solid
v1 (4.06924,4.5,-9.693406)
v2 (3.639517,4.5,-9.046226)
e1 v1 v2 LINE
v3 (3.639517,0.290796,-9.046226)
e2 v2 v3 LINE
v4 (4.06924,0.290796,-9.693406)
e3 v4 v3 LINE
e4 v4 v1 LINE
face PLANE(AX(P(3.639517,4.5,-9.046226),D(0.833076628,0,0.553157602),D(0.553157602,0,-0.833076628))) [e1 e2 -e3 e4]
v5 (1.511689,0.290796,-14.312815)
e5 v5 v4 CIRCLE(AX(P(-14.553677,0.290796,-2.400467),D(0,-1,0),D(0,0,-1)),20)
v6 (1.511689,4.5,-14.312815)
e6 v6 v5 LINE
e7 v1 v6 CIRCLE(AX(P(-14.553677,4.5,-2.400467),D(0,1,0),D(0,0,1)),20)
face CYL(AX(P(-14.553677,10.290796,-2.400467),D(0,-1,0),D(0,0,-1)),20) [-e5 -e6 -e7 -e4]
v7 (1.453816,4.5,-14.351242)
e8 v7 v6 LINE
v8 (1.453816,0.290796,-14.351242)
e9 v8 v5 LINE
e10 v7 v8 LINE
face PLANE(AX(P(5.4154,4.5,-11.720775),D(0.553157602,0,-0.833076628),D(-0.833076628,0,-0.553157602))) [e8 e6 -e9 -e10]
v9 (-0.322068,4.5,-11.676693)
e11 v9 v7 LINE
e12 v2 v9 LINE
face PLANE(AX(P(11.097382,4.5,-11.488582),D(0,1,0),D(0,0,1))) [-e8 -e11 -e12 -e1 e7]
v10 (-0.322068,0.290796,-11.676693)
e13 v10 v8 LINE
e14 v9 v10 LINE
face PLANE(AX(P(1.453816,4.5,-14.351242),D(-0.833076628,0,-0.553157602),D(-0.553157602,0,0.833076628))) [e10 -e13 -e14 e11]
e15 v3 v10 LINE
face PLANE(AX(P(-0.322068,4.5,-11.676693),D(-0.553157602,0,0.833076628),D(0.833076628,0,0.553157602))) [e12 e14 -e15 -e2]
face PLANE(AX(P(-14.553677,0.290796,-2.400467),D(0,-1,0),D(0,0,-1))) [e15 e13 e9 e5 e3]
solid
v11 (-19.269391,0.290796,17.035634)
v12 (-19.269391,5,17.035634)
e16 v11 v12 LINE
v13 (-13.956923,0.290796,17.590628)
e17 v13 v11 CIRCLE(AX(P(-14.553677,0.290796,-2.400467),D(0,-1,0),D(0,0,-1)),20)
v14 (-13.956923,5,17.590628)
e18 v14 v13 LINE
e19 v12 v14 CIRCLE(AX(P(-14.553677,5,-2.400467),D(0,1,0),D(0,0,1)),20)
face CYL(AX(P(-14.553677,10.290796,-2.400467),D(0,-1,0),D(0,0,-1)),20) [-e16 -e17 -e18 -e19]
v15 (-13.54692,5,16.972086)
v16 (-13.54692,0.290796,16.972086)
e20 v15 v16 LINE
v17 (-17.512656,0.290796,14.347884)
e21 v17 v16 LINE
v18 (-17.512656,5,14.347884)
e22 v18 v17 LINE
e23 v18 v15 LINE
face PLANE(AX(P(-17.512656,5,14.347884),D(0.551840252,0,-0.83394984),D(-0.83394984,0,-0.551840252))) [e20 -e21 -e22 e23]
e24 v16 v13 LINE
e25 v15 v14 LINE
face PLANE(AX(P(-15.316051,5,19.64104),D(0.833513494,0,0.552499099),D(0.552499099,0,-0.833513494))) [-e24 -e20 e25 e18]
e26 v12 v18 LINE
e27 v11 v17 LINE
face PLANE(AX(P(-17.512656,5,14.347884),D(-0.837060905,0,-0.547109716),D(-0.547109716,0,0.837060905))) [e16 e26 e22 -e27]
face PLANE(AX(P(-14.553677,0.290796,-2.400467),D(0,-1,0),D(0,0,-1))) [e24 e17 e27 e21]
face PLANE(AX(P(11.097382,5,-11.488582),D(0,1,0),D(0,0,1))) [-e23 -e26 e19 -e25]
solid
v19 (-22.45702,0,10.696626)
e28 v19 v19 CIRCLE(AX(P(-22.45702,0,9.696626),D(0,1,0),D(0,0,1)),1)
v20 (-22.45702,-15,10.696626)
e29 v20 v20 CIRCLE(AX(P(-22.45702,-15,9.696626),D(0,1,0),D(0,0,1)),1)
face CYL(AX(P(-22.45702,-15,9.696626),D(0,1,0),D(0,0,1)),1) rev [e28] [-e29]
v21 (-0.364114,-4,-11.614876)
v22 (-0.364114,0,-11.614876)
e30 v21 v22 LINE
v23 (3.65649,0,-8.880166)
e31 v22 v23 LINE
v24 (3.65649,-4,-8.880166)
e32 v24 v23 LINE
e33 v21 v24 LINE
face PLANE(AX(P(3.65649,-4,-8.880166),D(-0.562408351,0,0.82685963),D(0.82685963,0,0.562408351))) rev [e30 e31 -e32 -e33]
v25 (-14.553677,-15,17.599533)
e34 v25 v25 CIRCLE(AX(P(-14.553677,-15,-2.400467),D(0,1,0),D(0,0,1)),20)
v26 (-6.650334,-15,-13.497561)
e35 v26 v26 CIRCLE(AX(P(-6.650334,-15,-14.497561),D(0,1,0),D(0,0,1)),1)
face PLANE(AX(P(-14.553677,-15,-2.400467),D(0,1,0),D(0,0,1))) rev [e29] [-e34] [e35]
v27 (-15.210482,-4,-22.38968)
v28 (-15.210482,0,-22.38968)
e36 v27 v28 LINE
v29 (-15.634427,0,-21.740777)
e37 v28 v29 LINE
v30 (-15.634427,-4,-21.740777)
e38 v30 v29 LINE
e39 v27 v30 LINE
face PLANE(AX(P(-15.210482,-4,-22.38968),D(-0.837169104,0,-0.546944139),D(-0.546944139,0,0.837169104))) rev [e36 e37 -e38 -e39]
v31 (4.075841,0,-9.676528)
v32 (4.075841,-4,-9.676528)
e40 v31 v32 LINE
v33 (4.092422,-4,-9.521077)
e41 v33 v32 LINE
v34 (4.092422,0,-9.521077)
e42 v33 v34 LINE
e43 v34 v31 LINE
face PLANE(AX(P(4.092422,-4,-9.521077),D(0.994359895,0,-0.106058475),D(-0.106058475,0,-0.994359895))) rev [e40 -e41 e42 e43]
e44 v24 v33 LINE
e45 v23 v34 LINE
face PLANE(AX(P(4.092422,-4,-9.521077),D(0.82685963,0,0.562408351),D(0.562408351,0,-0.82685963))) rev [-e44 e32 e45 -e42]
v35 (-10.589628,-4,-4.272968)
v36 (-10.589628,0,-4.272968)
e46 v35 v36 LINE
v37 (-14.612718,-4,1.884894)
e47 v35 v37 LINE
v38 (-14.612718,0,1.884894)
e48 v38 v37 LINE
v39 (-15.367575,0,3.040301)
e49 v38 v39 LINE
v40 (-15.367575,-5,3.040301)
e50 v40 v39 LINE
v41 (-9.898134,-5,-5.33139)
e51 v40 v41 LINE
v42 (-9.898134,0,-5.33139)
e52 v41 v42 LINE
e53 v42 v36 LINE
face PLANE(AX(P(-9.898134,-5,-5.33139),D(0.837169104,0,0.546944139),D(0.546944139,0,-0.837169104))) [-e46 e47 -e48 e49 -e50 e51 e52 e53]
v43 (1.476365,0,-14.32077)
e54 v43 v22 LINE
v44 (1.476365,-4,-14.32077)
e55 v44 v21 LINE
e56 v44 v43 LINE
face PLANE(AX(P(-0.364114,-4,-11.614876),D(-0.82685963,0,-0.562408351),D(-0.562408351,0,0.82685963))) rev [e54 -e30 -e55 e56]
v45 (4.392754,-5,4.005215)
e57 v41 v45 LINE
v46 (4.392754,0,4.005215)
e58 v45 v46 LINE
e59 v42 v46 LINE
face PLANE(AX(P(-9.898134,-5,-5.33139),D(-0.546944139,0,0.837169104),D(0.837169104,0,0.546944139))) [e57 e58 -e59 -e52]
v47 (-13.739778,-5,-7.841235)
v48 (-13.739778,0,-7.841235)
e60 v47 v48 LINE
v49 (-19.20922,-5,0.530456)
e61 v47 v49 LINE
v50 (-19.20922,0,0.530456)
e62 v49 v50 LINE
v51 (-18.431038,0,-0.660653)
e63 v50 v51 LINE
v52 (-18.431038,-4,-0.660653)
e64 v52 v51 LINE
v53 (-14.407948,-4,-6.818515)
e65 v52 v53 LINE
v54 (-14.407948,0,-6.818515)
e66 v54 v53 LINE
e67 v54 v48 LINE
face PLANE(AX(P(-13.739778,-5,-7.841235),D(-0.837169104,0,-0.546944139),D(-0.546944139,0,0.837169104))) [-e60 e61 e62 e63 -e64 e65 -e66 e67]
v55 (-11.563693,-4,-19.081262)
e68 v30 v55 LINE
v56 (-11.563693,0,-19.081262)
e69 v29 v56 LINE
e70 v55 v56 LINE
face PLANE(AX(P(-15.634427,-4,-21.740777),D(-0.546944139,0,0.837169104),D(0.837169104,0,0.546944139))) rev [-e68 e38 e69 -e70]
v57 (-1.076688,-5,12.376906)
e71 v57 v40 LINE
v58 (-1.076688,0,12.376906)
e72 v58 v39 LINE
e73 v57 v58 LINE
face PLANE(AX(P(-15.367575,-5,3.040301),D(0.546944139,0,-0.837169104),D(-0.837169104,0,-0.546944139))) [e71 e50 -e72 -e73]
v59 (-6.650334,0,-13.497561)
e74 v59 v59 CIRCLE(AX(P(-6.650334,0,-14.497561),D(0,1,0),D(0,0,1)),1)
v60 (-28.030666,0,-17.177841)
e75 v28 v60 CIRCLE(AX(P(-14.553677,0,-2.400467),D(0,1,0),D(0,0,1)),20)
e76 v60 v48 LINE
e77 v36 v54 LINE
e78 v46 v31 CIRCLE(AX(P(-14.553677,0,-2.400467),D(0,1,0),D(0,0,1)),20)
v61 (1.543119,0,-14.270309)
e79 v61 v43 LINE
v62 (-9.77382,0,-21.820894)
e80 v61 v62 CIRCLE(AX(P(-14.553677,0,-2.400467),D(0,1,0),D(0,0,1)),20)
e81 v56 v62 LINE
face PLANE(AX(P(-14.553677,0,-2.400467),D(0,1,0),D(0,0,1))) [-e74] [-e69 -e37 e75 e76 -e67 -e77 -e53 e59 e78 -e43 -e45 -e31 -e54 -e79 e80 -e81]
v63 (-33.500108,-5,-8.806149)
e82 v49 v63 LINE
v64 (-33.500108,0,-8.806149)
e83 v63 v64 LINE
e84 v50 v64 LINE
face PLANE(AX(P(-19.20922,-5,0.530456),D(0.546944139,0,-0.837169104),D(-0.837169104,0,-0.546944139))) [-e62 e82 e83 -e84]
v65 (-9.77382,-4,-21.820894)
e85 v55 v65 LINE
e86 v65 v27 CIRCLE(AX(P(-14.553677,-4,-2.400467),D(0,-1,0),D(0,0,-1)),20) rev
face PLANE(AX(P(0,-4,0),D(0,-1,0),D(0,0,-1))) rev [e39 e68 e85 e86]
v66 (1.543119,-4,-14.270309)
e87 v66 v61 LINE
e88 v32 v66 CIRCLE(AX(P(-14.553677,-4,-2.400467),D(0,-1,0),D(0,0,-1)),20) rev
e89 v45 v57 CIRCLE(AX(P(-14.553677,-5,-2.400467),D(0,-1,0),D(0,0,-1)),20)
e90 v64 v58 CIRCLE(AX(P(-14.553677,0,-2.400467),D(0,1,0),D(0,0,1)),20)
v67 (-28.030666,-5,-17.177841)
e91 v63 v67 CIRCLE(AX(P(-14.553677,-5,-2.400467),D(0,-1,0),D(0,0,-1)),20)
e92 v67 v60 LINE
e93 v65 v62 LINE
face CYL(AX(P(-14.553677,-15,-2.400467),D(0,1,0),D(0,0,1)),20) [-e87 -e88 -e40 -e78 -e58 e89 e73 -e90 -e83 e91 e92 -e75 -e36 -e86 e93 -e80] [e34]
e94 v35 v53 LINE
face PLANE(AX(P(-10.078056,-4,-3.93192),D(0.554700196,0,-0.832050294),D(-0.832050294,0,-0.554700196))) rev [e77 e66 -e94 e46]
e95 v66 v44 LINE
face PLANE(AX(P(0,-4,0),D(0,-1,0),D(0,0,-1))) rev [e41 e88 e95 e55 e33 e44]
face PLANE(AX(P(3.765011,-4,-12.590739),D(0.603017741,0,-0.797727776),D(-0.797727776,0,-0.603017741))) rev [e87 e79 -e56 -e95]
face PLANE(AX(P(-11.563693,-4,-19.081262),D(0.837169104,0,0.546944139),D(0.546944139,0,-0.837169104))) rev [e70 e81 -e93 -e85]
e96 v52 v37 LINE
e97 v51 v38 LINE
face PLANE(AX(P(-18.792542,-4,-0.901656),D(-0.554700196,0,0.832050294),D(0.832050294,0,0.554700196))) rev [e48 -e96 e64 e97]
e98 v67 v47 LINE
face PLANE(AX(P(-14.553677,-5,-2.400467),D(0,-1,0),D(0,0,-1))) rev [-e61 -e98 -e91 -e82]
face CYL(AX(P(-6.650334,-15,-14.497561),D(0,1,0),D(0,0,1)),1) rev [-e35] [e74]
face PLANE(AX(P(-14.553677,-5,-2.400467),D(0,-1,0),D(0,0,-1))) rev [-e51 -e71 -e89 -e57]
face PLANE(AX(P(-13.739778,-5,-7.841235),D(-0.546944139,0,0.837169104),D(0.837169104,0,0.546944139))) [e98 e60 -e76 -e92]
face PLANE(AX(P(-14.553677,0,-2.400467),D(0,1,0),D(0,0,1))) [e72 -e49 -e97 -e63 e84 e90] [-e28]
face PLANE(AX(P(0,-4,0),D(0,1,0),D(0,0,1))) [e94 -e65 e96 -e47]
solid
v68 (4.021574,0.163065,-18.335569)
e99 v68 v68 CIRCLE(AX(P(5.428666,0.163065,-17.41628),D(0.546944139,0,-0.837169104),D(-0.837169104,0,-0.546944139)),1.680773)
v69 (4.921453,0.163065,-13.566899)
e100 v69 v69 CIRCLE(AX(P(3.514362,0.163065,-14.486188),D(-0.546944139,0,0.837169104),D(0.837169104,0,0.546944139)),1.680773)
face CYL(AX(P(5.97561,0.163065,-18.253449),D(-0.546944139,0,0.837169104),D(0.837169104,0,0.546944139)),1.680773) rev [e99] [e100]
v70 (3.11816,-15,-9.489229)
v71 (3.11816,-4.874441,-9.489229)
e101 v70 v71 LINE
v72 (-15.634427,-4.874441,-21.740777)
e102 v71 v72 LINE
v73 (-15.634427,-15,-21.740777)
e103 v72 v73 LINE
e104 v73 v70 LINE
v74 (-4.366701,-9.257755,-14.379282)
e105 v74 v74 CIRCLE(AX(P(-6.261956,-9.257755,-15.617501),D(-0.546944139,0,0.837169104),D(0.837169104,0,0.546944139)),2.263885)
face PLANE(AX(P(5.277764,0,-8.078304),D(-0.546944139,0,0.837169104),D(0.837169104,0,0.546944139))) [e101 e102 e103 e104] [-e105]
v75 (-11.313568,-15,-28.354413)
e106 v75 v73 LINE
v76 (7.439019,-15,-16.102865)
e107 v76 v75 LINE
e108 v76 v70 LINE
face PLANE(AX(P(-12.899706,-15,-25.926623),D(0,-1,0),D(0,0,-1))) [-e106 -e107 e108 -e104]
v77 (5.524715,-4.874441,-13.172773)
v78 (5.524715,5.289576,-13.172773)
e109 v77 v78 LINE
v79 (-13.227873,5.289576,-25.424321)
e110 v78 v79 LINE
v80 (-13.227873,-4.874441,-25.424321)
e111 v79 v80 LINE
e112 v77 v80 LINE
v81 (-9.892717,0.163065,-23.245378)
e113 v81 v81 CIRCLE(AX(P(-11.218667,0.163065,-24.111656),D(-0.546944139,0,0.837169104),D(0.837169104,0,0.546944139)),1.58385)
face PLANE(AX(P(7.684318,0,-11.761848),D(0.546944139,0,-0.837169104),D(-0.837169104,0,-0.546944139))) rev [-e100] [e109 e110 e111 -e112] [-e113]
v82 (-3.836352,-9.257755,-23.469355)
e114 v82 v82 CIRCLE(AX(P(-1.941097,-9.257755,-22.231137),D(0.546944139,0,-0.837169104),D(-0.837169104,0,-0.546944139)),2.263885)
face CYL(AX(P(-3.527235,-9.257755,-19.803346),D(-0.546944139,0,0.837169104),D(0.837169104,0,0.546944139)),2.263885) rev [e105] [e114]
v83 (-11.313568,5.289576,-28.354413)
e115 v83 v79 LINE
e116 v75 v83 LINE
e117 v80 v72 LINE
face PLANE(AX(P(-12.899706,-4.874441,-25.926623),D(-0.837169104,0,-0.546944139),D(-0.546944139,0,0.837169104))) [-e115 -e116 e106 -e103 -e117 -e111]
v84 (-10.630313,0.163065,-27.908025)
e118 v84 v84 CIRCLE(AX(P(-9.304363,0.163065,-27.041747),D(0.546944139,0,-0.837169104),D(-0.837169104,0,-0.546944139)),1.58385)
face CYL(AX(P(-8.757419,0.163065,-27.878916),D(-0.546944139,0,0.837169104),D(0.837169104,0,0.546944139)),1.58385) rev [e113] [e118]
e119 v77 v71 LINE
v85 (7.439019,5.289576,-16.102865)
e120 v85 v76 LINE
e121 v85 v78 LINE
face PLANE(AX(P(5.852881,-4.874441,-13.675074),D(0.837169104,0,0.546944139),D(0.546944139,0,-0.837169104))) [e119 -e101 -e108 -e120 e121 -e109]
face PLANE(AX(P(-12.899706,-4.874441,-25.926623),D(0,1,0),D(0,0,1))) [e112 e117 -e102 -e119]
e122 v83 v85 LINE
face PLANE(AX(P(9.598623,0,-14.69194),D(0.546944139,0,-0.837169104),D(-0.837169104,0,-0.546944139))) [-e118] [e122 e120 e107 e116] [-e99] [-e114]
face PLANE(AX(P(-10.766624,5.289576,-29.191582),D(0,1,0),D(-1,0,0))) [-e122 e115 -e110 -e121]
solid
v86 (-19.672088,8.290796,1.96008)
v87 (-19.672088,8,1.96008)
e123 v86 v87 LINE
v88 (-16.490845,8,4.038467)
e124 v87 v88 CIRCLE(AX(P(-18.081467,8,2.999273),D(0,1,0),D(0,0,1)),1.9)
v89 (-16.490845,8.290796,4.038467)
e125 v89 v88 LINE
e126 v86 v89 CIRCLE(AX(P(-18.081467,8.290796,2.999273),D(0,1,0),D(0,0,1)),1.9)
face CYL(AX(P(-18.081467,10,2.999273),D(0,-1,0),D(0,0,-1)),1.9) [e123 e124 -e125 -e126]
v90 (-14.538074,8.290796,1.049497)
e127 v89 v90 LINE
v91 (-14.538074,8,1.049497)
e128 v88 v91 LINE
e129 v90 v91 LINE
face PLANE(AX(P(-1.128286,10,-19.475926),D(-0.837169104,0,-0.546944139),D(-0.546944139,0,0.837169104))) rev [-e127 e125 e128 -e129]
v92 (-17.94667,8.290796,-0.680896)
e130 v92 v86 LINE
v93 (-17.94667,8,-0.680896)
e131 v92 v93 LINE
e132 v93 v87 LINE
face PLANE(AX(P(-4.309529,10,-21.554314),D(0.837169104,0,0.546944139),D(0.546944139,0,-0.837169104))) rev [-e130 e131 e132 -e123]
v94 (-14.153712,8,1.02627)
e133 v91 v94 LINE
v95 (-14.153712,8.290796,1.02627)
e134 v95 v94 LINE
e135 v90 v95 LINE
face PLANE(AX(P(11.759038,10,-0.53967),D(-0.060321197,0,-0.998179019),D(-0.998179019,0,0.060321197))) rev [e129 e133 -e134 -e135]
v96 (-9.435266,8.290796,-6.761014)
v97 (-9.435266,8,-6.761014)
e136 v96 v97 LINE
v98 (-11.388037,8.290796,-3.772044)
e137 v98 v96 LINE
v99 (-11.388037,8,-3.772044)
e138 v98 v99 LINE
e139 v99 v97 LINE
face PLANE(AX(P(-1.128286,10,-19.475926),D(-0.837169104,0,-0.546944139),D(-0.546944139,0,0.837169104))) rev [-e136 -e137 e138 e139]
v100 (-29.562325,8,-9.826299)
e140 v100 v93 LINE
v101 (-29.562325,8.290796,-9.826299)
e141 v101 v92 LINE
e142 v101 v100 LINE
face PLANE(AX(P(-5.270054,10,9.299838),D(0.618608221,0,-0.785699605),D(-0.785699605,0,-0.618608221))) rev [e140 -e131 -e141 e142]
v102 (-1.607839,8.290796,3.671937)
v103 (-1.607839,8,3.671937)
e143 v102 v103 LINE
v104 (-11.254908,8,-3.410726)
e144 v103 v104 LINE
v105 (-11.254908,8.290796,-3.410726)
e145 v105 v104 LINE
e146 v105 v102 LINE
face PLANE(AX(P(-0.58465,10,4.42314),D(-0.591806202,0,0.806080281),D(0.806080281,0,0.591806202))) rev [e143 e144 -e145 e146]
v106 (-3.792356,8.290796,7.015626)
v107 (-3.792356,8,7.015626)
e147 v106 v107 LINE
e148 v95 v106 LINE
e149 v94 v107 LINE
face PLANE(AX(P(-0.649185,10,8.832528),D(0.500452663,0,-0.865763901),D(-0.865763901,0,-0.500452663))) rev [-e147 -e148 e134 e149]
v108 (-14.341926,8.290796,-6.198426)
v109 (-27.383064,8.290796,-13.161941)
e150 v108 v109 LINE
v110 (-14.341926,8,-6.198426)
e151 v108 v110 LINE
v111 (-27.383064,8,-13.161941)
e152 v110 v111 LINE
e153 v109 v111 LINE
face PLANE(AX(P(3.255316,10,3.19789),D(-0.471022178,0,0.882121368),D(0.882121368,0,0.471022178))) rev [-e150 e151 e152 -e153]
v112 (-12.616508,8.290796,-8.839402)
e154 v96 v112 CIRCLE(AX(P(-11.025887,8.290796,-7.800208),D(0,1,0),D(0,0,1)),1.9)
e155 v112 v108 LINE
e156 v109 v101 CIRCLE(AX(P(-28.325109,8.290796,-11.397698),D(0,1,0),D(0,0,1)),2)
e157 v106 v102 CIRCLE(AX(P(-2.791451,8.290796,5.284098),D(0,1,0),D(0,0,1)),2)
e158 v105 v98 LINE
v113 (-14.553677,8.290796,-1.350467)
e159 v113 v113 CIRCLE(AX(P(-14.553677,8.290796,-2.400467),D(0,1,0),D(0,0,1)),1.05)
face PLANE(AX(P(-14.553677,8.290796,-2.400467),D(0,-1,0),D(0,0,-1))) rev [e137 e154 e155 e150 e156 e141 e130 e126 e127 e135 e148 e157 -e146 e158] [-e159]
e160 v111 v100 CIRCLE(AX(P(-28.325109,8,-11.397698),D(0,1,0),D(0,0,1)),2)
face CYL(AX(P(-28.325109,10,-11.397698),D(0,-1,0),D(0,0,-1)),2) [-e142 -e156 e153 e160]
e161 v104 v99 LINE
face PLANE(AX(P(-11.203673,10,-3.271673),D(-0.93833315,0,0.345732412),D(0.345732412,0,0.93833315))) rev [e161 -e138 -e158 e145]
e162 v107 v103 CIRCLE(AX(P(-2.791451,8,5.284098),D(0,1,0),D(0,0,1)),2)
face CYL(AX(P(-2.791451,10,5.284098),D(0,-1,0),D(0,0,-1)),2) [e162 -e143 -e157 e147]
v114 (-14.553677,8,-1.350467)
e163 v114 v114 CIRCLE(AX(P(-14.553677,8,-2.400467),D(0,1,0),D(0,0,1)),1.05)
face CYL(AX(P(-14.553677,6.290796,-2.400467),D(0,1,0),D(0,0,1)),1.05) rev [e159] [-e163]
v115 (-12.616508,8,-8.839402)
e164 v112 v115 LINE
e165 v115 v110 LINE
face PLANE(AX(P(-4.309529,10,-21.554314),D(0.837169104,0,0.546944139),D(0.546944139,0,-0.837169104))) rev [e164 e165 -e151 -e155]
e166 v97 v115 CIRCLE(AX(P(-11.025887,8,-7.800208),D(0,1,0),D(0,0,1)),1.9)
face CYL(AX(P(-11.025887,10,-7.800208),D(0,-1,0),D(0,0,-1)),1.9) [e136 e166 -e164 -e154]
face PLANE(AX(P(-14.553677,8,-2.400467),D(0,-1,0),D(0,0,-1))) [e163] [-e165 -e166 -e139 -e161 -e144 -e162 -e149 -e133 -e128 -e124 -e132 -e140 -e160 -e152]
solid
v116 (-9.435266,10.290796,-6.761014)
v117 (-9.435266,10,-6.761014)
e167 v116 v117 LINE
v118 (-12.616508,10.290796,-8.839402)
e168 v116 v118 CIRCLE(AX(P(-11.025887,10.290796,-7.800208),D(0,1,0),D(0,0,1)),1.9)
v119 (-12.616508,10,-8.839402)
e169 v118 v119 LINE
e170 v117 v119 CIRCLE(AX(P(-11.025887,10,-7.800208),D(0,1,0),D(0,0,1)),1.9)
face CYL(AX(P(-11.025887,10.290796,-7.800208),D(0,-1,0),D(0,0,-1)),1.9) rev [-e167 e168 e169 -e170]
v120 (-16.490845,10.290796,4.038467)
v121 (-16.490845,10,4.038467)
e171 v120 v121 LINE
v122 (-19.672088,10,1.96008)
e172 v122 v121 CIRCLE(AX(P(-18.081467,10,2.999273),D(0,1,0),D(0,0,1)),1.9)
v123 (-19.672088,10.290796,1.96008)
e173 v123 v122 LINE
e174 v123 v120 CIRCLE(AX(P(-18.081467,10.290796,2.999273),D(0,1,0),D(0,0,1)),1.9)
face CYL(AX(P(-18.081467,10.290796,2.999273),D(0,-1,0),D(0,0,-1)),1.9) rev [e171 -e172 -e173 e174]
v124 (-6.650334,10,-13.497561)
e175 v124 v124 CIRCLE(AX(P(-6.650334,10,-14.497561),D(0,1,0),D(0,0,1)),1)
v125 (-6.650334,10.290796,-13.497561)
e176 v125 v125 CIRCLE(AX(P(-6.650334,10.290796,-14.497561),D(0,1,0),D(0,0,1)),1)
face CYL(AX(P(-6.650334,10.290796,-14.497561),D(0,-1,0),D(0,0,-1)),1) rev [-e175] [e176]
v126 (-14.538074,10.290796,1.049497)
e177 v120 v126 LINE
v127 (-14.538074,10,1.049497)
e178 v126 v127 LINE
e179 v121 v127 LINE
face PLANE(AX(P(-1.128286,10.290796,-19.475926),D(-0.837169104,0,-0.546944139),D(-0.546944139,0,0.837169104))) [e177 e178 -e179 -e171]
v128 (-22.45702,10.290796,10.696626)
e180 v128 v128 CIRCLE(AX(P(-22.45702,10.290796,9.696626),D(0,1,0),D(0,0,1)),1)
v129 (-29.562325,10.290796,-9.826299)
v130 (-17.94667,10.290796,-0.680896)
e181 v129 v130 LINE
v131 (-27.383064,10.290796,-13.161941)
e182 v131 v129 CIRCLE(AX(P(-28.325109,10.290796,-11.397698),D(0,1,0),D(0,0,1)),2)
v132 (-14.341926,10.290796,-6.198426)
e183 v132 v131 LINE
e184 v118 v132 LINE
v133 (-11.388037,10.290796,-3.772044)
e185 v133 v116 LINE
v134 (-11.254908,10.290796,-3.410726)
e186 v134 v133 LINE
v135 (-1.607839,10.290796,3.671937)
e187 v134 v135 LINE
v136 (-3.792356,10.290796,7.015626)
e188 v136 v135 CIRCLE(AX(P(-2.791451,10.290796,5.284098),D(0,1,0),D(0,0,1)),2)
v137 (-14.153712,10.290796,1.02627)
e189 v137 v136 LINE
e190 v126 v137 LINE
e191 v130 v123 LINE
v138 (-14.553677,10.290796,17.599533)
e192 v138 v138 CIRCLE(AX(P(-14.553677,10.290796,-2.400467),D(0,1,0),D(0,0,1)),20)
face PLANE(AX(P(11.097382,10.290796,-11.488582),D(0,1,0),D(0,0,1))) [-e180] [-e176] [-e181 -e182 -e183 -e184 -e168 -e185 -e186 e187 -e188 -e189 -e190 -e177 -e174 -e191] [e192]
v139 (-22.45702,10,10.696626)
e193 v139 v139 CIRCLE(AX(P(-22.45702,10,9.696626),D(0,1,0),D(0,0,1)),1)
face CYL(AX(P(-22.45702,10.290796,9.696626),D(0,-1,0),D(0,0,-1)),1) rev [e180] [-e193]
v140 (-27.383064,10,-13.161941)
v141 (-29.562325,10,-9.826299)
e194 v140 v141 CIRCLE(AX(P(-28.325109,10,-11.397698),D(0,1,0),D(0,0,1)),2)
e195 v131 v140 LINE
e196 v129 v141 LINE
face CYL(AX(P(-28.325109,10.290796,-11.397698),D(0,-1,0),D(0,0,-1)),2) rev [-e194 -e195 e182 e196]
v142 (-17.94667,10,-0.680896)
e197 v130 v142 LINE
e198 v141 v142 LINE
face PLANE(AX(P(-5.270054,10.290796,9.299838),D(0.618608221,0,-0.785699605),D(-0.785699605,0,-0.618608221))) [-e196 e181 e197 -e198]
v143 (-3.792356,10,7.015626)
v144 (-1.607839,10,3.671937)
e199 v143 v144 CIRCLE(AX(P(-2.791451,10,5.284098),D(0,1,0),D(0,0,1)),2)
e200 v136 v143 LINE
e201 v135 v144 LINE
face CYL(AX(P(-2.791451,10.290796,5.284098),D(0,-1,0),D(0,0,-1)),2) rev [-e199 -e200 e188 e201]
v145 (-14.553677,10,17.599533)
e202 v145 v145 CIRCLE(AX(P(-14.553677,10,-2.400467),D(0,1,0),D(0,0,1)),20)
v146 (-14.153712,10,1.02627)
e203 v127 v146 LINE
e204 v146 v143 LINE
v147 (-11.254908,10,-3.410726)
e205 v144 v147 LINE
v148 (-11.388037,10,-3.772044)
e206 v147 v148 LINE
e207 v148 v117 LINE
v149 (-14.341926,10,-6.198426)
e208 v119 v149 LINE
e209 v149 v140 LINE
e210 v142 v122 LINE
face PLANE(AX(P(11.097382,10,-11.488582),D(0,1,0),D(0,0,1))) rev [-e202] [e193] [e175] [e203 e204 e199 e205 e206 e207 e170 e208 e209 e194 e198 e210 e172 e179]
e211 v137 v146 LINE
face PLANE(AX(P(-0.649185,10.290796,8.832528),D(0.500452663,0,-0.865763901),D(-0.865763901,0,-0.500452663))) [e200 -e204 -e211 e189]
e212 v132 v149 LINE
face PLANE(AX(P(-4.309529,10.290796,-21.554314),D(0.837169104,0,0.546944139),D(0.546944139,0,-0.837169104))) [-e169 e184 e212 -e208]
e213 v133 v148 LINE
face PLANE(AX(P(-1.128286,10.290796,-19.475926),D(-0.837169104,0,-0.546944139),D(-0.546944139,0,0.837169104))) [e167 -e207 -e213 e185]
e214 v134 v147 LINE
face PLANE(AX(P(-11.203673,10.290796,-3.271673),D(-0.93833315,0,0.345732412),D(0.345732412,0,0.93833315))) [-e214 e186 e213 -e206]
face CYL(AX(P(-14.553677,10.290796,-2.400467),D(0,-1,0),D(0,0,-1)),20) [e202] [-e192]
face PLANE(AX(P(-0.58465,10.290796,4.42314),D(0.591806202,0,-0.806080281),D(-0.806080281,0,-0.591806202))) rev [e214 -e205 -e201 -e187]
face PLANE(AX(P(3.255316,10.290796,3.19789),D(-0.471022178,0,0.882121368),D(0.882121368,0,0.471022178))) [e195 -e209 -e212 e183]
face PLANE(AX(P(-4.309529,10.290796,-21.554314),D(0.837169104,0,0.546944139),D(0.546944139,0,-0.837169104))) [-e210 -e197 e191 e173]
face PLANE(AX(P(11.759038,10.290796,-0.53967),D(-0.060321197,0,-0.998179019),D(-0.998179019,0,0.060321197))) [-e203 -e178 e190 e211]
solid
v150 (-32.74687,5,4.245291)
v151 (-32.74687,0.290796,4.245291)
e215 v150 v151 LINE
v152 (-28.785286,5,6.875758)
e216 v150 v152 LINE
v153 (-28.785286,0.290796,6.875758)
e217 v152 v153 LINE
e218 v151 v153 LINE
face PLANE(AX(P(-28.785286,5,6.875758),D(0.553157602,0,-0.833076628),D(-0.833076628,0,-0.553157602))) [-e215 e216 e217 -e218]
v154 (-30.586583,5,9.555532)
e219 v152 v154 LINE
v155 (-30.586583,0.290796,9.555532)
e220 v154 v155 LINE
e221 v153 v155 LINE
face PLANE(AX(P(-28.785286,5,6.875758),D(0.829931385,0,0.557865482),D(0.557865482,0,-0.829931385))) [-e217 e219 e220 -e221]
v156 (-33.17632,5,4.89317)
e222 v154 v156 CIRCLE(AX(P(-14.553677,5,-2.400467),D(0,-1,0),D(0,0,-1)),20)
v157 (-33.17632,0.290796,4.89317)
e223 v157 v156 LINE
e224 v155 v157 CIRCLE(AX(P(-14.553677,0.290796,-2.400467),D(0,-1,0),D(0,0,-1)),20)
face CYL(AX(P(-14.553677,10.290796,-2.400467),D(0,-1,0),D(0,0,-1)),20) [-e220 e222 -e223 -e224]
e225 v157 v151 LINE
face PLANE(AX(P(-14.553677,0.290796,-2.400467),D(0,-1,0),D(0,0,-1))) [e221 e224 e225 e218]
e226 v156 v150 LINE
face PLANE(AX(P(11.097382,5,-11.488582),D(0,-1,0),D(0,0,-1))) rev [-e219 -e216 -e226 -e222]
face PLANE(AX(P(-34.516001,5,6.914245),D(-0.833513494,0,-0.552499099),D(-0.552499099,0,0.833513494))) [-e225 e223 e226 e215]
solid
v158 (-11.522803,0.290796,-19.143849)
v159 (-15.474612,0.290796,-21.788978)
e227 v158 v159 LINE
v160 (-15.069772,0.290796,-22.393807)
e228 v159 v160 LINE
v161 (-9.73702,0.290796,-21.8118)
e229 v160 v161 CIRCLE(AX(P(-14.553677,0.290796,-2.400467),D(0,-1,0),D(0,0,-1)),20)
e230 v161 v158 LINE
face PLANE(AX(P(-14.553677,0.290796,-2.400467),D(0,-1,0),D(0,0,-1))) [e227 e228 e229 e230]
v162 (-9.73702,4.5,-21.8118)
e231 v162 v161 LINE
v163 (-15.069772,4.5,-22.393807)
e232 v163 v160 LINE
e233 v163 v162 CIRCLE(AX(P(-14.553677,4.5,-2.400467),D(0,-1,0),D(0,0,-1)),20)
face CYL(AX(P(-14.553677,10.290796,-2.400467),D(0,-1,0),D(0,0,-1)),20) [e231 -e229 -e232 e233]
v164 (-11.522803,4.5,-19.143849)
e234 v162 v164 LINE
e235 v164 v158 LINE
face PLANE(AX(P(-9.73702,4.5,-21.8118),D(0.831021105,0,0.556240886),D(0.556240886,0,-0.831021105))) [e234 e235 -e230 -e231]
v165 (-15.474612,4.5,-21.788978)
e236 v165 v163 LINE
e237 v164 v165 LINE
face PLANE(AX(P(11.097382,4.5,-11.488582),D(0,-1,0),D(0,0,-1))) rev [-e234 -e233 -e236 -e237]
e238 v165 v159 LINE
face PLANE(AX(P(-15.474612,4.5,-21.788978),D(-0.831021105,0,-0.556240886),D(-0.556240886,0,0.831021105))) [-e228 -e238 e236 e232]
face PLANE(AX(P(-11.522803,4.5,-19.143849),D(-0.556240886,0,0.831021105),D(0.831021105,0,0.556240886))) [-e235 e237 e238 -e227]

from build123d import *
from build123d.topology import SkipClean

# Parameters (mm, degrees)
SERVO_CONNECTOR_1_START         = 0.290796426
SERVO_CONNECTOR_1_OUTLINE_R     = 20
SERVO_CONNECTOR_1_OUTLINE_R_2   = 1
SERVO_CONNECTOR_1_DEPTH         = 10
SERVO_CONNECTOR_1_START_2       = -4.709203574
SERVO_CONNECTOR_1_2_DEPTH       = 13
SERVO_CONNECTOR_1_3_DEPTH       = 8
SERVO_CONNECTOR_1_START_3       = 6.290796426
SERVO_CONNECTOR_1_4_OUTLINE_R   = 2.3
SERVO_CONNECTOR_1_4_OUTLINE_R_2 = 1.05
SERVO_CONNECTOR_1_4_DEPTH       = 2
SKETCH5_R                       = 20
SKETCH5_R_2                     = 1
BOSS_EXTRUDE1_DEPTH             = 15
CAVITY1_OUTLINE_R               = 1
CAVITY1_DEPTH                   = 10
CAVITY1_START                   = -5
CAVITY1_2_DEPTH                 = 13
CAVITY1_START_2                 = 0.290796426
CAVITY1_3_OUTLINE_R             = 1.05
CAVITY1_3_DEPTH                 = 7.709203574
CAVITY1_START_3                 = 5
CAVITY1_4_DEPTH                 = 5
CAVITY1_START_4                 = 4.5
CAVITY1_5_DEPTH                 = 0.5
CUT_EXTRUDE1_DEPTH              = 4
SKETCH10_W                      = 22.399999201
SKETCH10_H                      = 20.28957609
SKETCH10_R                      = 2.263885391
SKETCH10_R_2                    = 1.680773428
SKETCH10_R_3                    = 1.58384996
BOSS_EXTRUDE2_DEPTH             = 4.5
SKETCH18_W                      = 22.399999201
SKETCH18_H                      = 10.125559165
SKETCH18_R                      = 2.263885391
BOSS_EXTRUDE26_DEPTH            = 5
CUT_EXTRUDE2_DEPTH              = 4
SKETCH22_W                      = 22.399999201
SKETCH22_H                      = 20.28957609
SKETCH22_R                      = 1.680773428
SKETCH22_R_2                    = 1.58384996
SKETCH22_R_3                    = 2.263885391
CUT_EXTRUDE3_DEPTH              = 1


# Read off the part's stored shape, not the designer's step: Servo_Connector_1, Cavity1
with BuildPart() as part:
    # Servo_Connector_1 outline → Servo_Connector_1 (new body)
    with BuildSketch(Plane(origin=(0, 0, 0), x_dir=(1, 0, 0), z_dir=(0, 1, 0)).offset(SERVO_CONNECTOR_1_START)):
        with Locations((-14.553676836, 2.400467292)):
            Circle(SERVO_CONNECTOR_1_OUTLINE_R)
        with BuildLine():
            Line((-11.254907871, 3.410726325), (-1.607838516, -3.671937294))
            ThreePointArc((-1.607838516, -3.671937294), (-1.117112712, -6.377986132), (-3.792356246, -7.015625657))
            Line((-3.792356246, -7.015625657), (-14.153711806, -1.026269928))
            Line((-14.153711806, -1.026269928), (-14.538074231, -1.049497426))
            Line((-14.538074231, -1.049497426), (-16.490845232, -4.038467294))
            ThreePointArc((-16.490845232, -4.038467294), (-19.120660394, -4.589894729), (-19.672087828, -1.960079567))
            Line((-19.672087828, -1.960079567), (-17.946670336, 0.680896201))
            Line((-17.946670336, 0.680896201), (-29.562325044, 9.826299163))
            ThreePointArc((-29.562325044, 9.826299163), (-29.999446811, 12.49158665), (-27.383064246, 13.161941108))
            Line((-27.383064246, 13.161941108), (-14.341925933, 6.198426111))
            Line((-14.341925933, 6.198426111), (-12.61650844, 8.839401879))
            ThreePointArc((-12.61650844, 8.839401879), (-9.986693279, 9.390829313), (-9.435265844, 6.761014152))
            Line((-9.435265844, 6.761014152), (-11.388036845, 3.772044284))
            Line((-11.388036845, 3.772044284), (-11.254907871, 3.410726325))
        make_face(mode=Mode.SUBTRACT)
        with Locations((-6.650334033, 14.49756085)):
            Circle(SERVO_CONNECTOR_1_OUTLINE_R_2, mode=Mode.SUBTRACT)
        with Locations((-22.457019639, -9.696626265)):
            Circle(SERVO_CONNECTOR_1_OUTLINE_R_2, mode=Mode.SUBTRACT)
    extrude(amount=SERVO_CONNECTOR_1_DEPTH)

    # Servo_Connector_1 2 outline → Servo_Connector_1 2 (add)
    with SkipClean():  # the faces are left unmerged after this step: merging them gives an invalid solid
        with BuildSketch(Plane(origin=(0, 0, 0), x_dir=(1, 0, 0), z_dir=(0, 1, 0)).offset(SERVO_CONNECTOR_1_START_2)):
            with BuildLine():
                Line((-13.744445083, 7.844284333), (-28.030666138, 17.177840515))
                ThreePointArc((-28.030666138, 17.177840515), (-31.297058922, 13.339350064), (-33.500107524, 8.806149471))
                Line((-33.500107524, 8.806149471), (-19.213886469, -0.527406711))
                Line((-19.213886469, -0.527406711), (-13.744445083, 7.844284333))
            make_face()
            with BuildLine():
                Line((-15.362908589, -3.043349748), (-1.076687534, -12.37690593))
                ThreePointArc((-1.076687534, -12.37690593), (2.189705251, -8.53841548), (4.392753852, -4.005214887))
                Line((4.392753852, -4.005214887), (-9.893467203, 5.328341295))
                Line((-9.893467203, 5.328341295), (-15.362908589, -3.043349748))
            make_face()
        extrude(amount=SERVO_CONNECTOR_1_2_DEPTH)

    # Servo_Connector_1 3 outline → Servo_Connector_1 3 (add)
    with SkipClean():  # the faces are left unmerged after this step: merging them gives an invalid solid
        with BuildSketch(Plane(origin=(0, 0, 0), x_dir=(1, 0, 0), z_dir=(0, 1, 0)).offset(SERVO_CONNECTOR_1_START)):
            with BuildLine():
                ThreePointArc((-16.479165734, 3.658438876), (-13.29571537, 4.3259628), (-12.628174718, 1.142515943))
                Line((-12.628174718, 1.142515943), (-11.181503427, 3.356834416))
                Line((-11.181503427, 3.356834416), (-11.254907871, 3.410726325))
                Line((-11.254907871, 3.410726325), (-11.388036845, 3.772044284))
                Line((-11.388036845, 3.772044284), (-9.435265844, 6.761014152))
                ThreePointArc((-9.435265844, 6.761014152), (-9.986693279, 9.390829313), (-12.61650844, 8.839401879))
                Line((-12.61650844, 8.839401879), (-14.341925933, 6.198426111))
                Line((-14.341925933, 6.198426111), (-14.696153283, 6.387571215))
                Line((-14.696153283, 6.387571215), (-16.479165734, 3.658438876))
            make_face()
            with BuildLine():
                ThreePointArc((-12.628174718, 1.142515943), (-15.811638302, 0.474971784), (-16.479165734, 3.658438876))
                Line((-16.479165734, 3.658438876), (-18.262178269, 0.929306407))
                Line((-18.262178269, 0.929306407), (-17.946670336, 0.680896201))
                Line((-17.946670336, 0.680896201), (-19.672087828, -1.960079567))
                ThreePointArc((-19.672087828, -1.960079567), (-19.120660394, -4.589894729), (-16.490845232, -4.038467294))
                Line((-16.490845232, -4.038467294), (-14.538074231, -1.049497426))
                Line((-14.538074231, -1.049497426), (-14.153711806, -1.026269928))
                Line((-14.153711806, -1.026269928), (-14.074872366, -1.07184287))
                Line((-14.074872366, -1.07184287), (-12.628174718, 1.142515943))
            make_face()
        extrude(amount=SERVO_CONNECTOR_1_3_DEPTH)

    # Servo_Connector_1 4 outline → Servo_Connector_1 4 (add)
    with SkipClean():  # the faces are left unmerged after this step: merging them gives an invalid solid
        with BuildSketch(Plane(origin=(0, 0, 0), x_dir=(1, 0, 0), z_dir=(0, 1, 0)).offset(SERVO_CONNECTOR_1_START_3)):
            with Locations((-14.553676836, 2.400467292)):
                Circle(SERVO_CONNECTOR_1_4_OUTLINE_R)
            with Locations((-14.553676836, 2.400467292)):
                Circle(SERVO_CONNECTOR_1_4_OUTLINE_R_2, mode=Mode.SUBTRACT)
        extrude(amount=SERVO_CONNECTOR_1_4_DEPTH)

    # Cavity1 outline → Cavity1 (cut)
    with BuildSketch(Plane(origin=(0, 0, 0), x_dir=(1, 0, 0), z_dir=(0, 1, 0))):
        with BuildLine():
            ThreePointArc((-15.069772054, 22.393807326), (-31.218538546, 13.458603853), (-33.176320371, -4.893170193))
            Line((-33.176320371, -4.893170193), (-32.746870213, -4.245291305))
            Line((-32.746870213, -4.245291305), (-28.785286033, -6.875758097))
            Line((-28.785286033, -6.875758097), (-30.586583313, -9.555531616))
            ThreePointArc((-30.586583313, -9.555531616), (-25.581564287, -14.284427025), (-19.269391365, -17.035634078))
            Line((-19.269391365, -17.035634078), (-17.512656353, -14.347883968))
            Line((-17.512656353, -14.347883968), (-13.546919726, -16.972086279))
            Line((-13.546919726, -16.972086279), (-13.956923486, -17.590627862))
            ThreePointArc((-13.956923486, -17.590627862), (2.133251073, -8.624342773), (4.069240241, 9.693406312))
            Line((4.069240241, 9.693406312), (3.639516541, 9.046225889))
            Line((3.639516541, 9.046225889), (-0.32206764, 11.676692681))
            Line((-0.32206764, 11.676692681), (1.453816138, 14.351241968))
            Line((1.453816138, 14.351241968), (1.511688907, 14.312814817))
            ThreePointArc((1.511688907, 14.312814817), (-3.459831348, 19.041578802), (-9.737020182, 21.811799515))
            Line((-9.737020182, 21.811799515), (-11.522802686, 19.143849379))
            Line((-11.522802686, 19.143849379), (-15.474612102, 21.788978318))
            Line((-15.474612102, 21.788978318), (-15.069772054, 22.393807326))
        make_face()
        with BuildLine():
            Line((-14.341925933, 6.198426111), (-12.61650844, 8.839401879))
            ThreePointArc((-12.61650844, 8.839401879), (-9.986693279, 9.390829313), (-9.435265844, 6.761014152))
            Line((-9.435265844, 6.761014152), (-11.388036845, 3.772044284))
            Line((-11.388036845, 3.772044284), (-11.254907871, 3.410726325))
            Line((-11.254907871, 3.410726325), (-1.607838516, -3.671937294))
            ThreePointArc((-1.607838516, -3.671937294), (-1.117112712, -6.377986132), (-3.792356246, -7.015625657))
            Line((-3.792356246, -7.015625657), (-14.153711806, -1.026269928))
            Line((-14.153711806, -1.026269928), (-14.538074231, -1.049497426))
            Line((-14.538074231, -1.049497426), (-16.490845232, -4.038467294))
            ThreePointArc((-16.490845232, -4.038467294), (-19.120660394, -4.589894729), (-19.672087828, -1.960079567))
            Line((-19.672087828, -1.960079567), (-17.946670336, 0.680896201))
            Line((-17.946670336, 0.680896201), (-29.562325044, 9.826299163))
            ThreePointArc((-29.562325044, 9.826299163), (-29.999446811, 12.49158665), (-27.383064246, 13.161941108))
            Line((-27.383064246, 13.161941108), (-14.341925933, 6.198426111))
        make_face(mode=Mode.SUBTRACT)
        with Locations((-6.650334033, 14.49756085)):
            Circle(CAVITY1_OUTLINE_R, mode=Mode.SUBTRACT)
        with Locations((-22.457019639, -9.696626265)):
            Circle(CAVITY1_OUTLINE_R, mode=Mode.SUBTRACT)
    extrude(amount=CAVITY1_DEPTH, mode=Mode.SUBTRACT)


with BuildPart() as body_2:
    # Sketch5 → Boss-Extrude1 (new body)
    with BuildSketch(Plane(origin=(0, 0, 0), x_dir=(1, 0, 0), z_dir=(0, 1, 0))):
        with Locations(Location((-14.553676836, 2.400467292, 0), (0, 0, 270))):
            Circle(SKETCH5_R)
        with Locations(Location((-6.650334033, 14.49756085, 0), (0, 0, 270))):
            Circle(SKETCH5_R_2, mode=Mode.SUBTRACT)
        with Locations(Location((-22.457019639, -9.696626265, 0), (0, 0, 270))):
            Circle(SKETCH5_R_2, mode=Mode.SUBTRACT)
    extrude(amount=-BOSS_EXTRUDE1_DEPTH)


with BuildPart() as cavity1_2_tool:
    # Cavity1 2 outline → Cavity1 2 (new body)
    with BuildSketch(Plane(origin=(0, 0, 0), x_dir=(1, 0, 0), z_dir=(0, 1, 0)).offset(CAVITY1_START)):
        with BuildLine():
            Line((-13.739778259, 7.841235377), (-28.030666138, 17.177840515))
            ThreePointArc((-28.030666138, 17.177840515), (-31.297058922, 13.339350064), (-33.500107524, 8.806149471))
            Line((-33.500107524, 8.806149471), (-19.209219645, -0.530455667))
            Line((-19.209219645, -0.530455667), (-13.739778259, 7.841235377))
        make_face()
        with BuildLine():
            Line((-15.367575413, -3.040300792), (-1.076687534, -12.37690593))
            ThreePointArc((-1.076687534, -12.37690593), (2.189705251, -8.53841548), (4.392753852, -4.005214887))
            Line((4.392753852, -4.005214887), (-9.898134027, 5.331390251))
            Line((-9.898134027, 5.331390251), (-15.367575413, -3.040300792))
        make_face()
    extrude(amount=CAVITY1_2_DEPTH)


with BuildPart() as part_1:
    add(part.part)

    # Cavity1 2: cut by cavity1_2_tool
    add(cavity1_2_tool.part, mode=Mode.SUBTRACT)

    # Cavity1 3 outline → Cavity1 3 (cut)
    with BuildSketch(Plane(origin=(0, 0, 0), x_dir=(1, 0, 0), z_dir=(0, 1, 0)).offset(CAVITY1_START_2)):
        with BuildLine():
            Line((-12.61650844, 8.839401879), (-14.341925933, 6.198426111))
            Line((-14.341925933, 6.198426111), (-14.691216656, 6.384935228))
            Line((-14.691216656, 6.384935228), (-18.257781248, 0.925844482))
            Line((-18.257781248, 0.925844482), (-17.946670336, 0.680896201))
            Line((-17.946670336, 0.680896201), (-19.672087828, -1.960079567))
            ThreePointArc((-19.672087828, -1.960079567), (-19.120660394, -4.589894729), (-16.490845232, -4.038467294))
            Line((-16.490845232, -4.038467294), (-14.538074231, -1.049497426))
            Line((-14.538074231, -1.049497426), (-14.153711806, -1.026269928))
            Line((-14.153711806, -1.026269928), (-14.079705792, -1.06904892))
            Line((-14.079705792, -1.06904892), (-11.186003648, 3.360138378))
            Line((-11.186003648, 3.360138378), (-11.254907871, 3.410726325))
            Line((-11.254907871, 3.410726325), (-11.388036845, 3.772044284))
            Line((-11.388036845, 3.772044284), (-9.435265844, 6.761014152))
            ThreePointArc((-9.435265844, 6.761014152), (-9.986693279, 9.390829313), (-12.61650844, 8.839401879))
        make_face()
        with Locations((-14.553676836, 2.400467292)):
            Circle(CAVITY1_3_OUTLINE_R, mode=Mode.SUBTRACT)
    extrude(amount=CAVITY1_3_DEPTH, mode=Mode.SUBTRACT)

    # Cavity1 4 outline → Cavity1 4 (cut)
    with BuildSketch(Plane(origin=(0, 0, 0), x_dir=(1, 0, 0), z_dir=(0, 1, 0)).offset(CAVITY1_START_3)):
        with BuildLine():
            ThreePointArc((-9.737020182, 21.811799515), (-12.38379425, 22.282409088), (-15.069772054, 22.393807326))
            Line((-15.069772054, 22.393807326), (-15.474612102, 21.788978318))
            Line((-15.474612102, 21.788978318), (-11.522802686, 19.143849379))
            Line((-11.522802686, 19.143849379), (-9.737020182, 21.811799515))
        make_face()
        with BuildLine():
            Line((-32.746870213, -4.245291305), (-33.176320371, -4.893170193))
            ThreePointArc((-33.176320371, -4.893170193), (-32.037560563, -7.311062445), (-30.586583313, -9.555531616))
            Line((-30.586583313, -9.555531616), (-28.785286033, -6.875758097))
            Line((-28.785286033, -6.875758097), (-32.746870213, -4.245291305))
        make_face()
        with BuildLine():
            ThreePointArc((4.069240241, 9.693406312), (2.943579377, 12.087883099), (1.511688907, 14.312814817))
            Line((1.511688907, 14.312814817), (1.453816138, 14.351241968))
            Line((1.453816138, 14.351241968), (-0.32206764, 11.676692681))
            Line((-0.32206764, 11.676692681), (3.639516541, 9.046225889))
            Line((3.639516541, 9.046225889), (4.069240241, 9.693406312))
        make_face()
        with BuildLine():
            Line((-17.512656353, -14.347883968), (-19.269391365, -17.035634078))
            ThreePointArc((-19.269391365, -17.035634078), (-16.631768466, -17.491278111), (-13.956923486, -17.590627862))
            Line((-13.956923486, -17.590627862), (-13.546919726, -16.972086279))
            Line((-13.546919726, -16.972086279), (-17.512656353, -14.347883968))
        make_face()
    extrude(amount=CAVITY1_4_DEPTH, mode=Mode.SUBTRACT)

    # Cavity1 5 outline → Cavity1 5 (cut)
    with BuildSketch(Plane(origin=(0, 0, 0), x_dir=(1, 0, 0), z_dir=(0, 1, 0)).offset(CAVITY1_START_4)):
        with BuildLine():
            ThreePointArc((-9.737020182, 21.811799515), (-12.38379425, 22.282409088), (-15.069772054, 22.393807326))
            Line((-15.069772054, 22.393807326), (-15.474612102, 21.788978318))
            Line((-15.474612102, 21.788978318), (-11.522802686, 19.143849379))
            Line((-11.522802686, 19.143849379), (-9.737020182, 21.811799515))
        make_face()
        with BuildLine():
            ThreePointArc((4.069240241, 9.693406312), (2.943579377, 12.087883099), (1.511688907, 14.312814817))
            Line((1.511688907, 14.312814817), (1.453816138, 14.351241968))
            Line((1.453816138, 14.351241968), (-0.32206764, 11.676692681))
            Line((-0.32206764, 11.676692681), (3.639516541, 9.046225889))
            Line((3.639516541, 9.046225889), (4.069240241, 9.693406312))
        make_face()
    extrude(amount=CAVITY1_5_DEPTH, mode=Mode.SUBTRACT)


with BuildPart() as body_2_1:
    add(body_2.part)

    # Cavity1 2: cut by cavity1_2_tool
    add(cavity1_2_tool.part, mode=Mode.SUBTRACT)

    # Sketch8 → Cut-Extrude1 (cut)
    with BuildSketch(Plane(origin=(0, 0, 0), x_dir=(1, 0, 0), z_dir=(0, 1, 0))):
        Polygon((-18.792542403, 0.90165554), (-14.158020196, -2.188025931), (-10.078056202, 3.93192006), (-14.712578409, 7.021601531), align=None)
    extrude(amount=-CUT_EXTRUDE1_DEPTH, mode=Mode.SUBTRACT)

    # Sketch21 → Cut-Extrude2 (cut)
    with BuildSketch(Plane(origin=(0, 0, 0), x_dir=(1, 0, 0), z_dir=(0, 1, 0))):
        Polygon((-15.210482323, 22.389679547), (-15.634426933, 21.74077721), (-11.563692797, 19.081261749), (-9.773820487, 21.820893994), (-12.251021416, 23.268093801), align=None)
        Polygon((4.092421606, 9.521076927), (3.765011338, 12.590738631), (1.476365005, 14.320770333), (-0.364113871, 11.614875799), (3.656490453, 8.880165619), align=None)
    extrude(amount=-CUT_EXTRUDE2_DEPTH, mode=Mode.SUBTRACT)


with BuildPart() as body_3:
    # Sketch10 → Boss-Extrude2 (new body)
    with BuildSketch(Plane(origin=(7.684318373, 0, -11.761848196), x_dir=(0.8371691043312223, 0, 0.5469441386039888), z_dir=(-0.5469441386039888, 0, 0.8371691043312223))):
        with Locations((-13.779650256, -4.855211955)):
            Rectangle(SKETCH10_W, SKETCH10_H)
        with Locations((-13.784216706, -9.257754986)):
            Circle(SKETCH10_R, mode=Mode.SUBTRACT)
        with Locations((-4.981020949, 0.163064574)):
            Circle(SKETCH10_R_2, mode=Mode.SUBTRACT)
        with Locations((-22.579650208, 0.163064574)):
            Circle(SKETCH10_R_3, mode=Mode.SUBTRACT)
    extrude(amount=-BOSS_EXTRUDE2_DEPTH)


with BuildPart() as body_4:
    # Sketch18 → Boss-Extrude26 (new body)
    with BuildSketch(Plane(origin=(5.277764163, 0, -8.078304136), x_dir=(0.8371691043312223, 0, 0.5469441386039888), z_dir=(-0.5469441386039888, 0, 0.8371691043312223))):
        with Locations((-13.779650256, -9.937220418)):
            Rectangle(SKETCH18_W, SKETCH18_H)
        with Locations((-13.784216706, -9.257754986)):
            Circle(SKETCH18_R, mode=Mode.SUBTRACT)
    extrude(amount=-BOSS_EXTRUDE26_DEPTH)

    # Combine4: union body 3
    add(body_3.part)

    # Sketch22 → Cut-Extrude3 (cut)
    with BuildSketch(Plane(origin=(10.145566997, 0, -15.529109165), x_dir=(-0.8371691043312223, 0, -0.5469441386039888), z_dir=(0.5469441386039888, 0, -0.8371691043312223))):
        with Locations((13.779650256, -4.855211955)):
            Rectangle(SKETCH22_W, SKETCH22_H)
        with Locations(Location((4.981020949, 0.163064574, 0), (0, 0, 180))):
            Circle(SKETCH22_R, mode=Mode.SUBTRACT)
        with Locations(Location((22.579650208, 0.163064574, 0), (0, 0, 180))):
            Circle(SKETCH22_R_2, mode=Mode.SUBTRACT)
        with Locations(Location((13.784216706, -9.257754986, 0), (0, 0, 180))):
            Circle(SKETCH22_R_3, mode=Mode.SUBTRACT)
    extrude(amount=-CUT_EXTRUDE3_DEPTH, mode=Mode.SUBTRACT)


solid = Compound([part_1.part, body_2_1.part, body_4.part])
